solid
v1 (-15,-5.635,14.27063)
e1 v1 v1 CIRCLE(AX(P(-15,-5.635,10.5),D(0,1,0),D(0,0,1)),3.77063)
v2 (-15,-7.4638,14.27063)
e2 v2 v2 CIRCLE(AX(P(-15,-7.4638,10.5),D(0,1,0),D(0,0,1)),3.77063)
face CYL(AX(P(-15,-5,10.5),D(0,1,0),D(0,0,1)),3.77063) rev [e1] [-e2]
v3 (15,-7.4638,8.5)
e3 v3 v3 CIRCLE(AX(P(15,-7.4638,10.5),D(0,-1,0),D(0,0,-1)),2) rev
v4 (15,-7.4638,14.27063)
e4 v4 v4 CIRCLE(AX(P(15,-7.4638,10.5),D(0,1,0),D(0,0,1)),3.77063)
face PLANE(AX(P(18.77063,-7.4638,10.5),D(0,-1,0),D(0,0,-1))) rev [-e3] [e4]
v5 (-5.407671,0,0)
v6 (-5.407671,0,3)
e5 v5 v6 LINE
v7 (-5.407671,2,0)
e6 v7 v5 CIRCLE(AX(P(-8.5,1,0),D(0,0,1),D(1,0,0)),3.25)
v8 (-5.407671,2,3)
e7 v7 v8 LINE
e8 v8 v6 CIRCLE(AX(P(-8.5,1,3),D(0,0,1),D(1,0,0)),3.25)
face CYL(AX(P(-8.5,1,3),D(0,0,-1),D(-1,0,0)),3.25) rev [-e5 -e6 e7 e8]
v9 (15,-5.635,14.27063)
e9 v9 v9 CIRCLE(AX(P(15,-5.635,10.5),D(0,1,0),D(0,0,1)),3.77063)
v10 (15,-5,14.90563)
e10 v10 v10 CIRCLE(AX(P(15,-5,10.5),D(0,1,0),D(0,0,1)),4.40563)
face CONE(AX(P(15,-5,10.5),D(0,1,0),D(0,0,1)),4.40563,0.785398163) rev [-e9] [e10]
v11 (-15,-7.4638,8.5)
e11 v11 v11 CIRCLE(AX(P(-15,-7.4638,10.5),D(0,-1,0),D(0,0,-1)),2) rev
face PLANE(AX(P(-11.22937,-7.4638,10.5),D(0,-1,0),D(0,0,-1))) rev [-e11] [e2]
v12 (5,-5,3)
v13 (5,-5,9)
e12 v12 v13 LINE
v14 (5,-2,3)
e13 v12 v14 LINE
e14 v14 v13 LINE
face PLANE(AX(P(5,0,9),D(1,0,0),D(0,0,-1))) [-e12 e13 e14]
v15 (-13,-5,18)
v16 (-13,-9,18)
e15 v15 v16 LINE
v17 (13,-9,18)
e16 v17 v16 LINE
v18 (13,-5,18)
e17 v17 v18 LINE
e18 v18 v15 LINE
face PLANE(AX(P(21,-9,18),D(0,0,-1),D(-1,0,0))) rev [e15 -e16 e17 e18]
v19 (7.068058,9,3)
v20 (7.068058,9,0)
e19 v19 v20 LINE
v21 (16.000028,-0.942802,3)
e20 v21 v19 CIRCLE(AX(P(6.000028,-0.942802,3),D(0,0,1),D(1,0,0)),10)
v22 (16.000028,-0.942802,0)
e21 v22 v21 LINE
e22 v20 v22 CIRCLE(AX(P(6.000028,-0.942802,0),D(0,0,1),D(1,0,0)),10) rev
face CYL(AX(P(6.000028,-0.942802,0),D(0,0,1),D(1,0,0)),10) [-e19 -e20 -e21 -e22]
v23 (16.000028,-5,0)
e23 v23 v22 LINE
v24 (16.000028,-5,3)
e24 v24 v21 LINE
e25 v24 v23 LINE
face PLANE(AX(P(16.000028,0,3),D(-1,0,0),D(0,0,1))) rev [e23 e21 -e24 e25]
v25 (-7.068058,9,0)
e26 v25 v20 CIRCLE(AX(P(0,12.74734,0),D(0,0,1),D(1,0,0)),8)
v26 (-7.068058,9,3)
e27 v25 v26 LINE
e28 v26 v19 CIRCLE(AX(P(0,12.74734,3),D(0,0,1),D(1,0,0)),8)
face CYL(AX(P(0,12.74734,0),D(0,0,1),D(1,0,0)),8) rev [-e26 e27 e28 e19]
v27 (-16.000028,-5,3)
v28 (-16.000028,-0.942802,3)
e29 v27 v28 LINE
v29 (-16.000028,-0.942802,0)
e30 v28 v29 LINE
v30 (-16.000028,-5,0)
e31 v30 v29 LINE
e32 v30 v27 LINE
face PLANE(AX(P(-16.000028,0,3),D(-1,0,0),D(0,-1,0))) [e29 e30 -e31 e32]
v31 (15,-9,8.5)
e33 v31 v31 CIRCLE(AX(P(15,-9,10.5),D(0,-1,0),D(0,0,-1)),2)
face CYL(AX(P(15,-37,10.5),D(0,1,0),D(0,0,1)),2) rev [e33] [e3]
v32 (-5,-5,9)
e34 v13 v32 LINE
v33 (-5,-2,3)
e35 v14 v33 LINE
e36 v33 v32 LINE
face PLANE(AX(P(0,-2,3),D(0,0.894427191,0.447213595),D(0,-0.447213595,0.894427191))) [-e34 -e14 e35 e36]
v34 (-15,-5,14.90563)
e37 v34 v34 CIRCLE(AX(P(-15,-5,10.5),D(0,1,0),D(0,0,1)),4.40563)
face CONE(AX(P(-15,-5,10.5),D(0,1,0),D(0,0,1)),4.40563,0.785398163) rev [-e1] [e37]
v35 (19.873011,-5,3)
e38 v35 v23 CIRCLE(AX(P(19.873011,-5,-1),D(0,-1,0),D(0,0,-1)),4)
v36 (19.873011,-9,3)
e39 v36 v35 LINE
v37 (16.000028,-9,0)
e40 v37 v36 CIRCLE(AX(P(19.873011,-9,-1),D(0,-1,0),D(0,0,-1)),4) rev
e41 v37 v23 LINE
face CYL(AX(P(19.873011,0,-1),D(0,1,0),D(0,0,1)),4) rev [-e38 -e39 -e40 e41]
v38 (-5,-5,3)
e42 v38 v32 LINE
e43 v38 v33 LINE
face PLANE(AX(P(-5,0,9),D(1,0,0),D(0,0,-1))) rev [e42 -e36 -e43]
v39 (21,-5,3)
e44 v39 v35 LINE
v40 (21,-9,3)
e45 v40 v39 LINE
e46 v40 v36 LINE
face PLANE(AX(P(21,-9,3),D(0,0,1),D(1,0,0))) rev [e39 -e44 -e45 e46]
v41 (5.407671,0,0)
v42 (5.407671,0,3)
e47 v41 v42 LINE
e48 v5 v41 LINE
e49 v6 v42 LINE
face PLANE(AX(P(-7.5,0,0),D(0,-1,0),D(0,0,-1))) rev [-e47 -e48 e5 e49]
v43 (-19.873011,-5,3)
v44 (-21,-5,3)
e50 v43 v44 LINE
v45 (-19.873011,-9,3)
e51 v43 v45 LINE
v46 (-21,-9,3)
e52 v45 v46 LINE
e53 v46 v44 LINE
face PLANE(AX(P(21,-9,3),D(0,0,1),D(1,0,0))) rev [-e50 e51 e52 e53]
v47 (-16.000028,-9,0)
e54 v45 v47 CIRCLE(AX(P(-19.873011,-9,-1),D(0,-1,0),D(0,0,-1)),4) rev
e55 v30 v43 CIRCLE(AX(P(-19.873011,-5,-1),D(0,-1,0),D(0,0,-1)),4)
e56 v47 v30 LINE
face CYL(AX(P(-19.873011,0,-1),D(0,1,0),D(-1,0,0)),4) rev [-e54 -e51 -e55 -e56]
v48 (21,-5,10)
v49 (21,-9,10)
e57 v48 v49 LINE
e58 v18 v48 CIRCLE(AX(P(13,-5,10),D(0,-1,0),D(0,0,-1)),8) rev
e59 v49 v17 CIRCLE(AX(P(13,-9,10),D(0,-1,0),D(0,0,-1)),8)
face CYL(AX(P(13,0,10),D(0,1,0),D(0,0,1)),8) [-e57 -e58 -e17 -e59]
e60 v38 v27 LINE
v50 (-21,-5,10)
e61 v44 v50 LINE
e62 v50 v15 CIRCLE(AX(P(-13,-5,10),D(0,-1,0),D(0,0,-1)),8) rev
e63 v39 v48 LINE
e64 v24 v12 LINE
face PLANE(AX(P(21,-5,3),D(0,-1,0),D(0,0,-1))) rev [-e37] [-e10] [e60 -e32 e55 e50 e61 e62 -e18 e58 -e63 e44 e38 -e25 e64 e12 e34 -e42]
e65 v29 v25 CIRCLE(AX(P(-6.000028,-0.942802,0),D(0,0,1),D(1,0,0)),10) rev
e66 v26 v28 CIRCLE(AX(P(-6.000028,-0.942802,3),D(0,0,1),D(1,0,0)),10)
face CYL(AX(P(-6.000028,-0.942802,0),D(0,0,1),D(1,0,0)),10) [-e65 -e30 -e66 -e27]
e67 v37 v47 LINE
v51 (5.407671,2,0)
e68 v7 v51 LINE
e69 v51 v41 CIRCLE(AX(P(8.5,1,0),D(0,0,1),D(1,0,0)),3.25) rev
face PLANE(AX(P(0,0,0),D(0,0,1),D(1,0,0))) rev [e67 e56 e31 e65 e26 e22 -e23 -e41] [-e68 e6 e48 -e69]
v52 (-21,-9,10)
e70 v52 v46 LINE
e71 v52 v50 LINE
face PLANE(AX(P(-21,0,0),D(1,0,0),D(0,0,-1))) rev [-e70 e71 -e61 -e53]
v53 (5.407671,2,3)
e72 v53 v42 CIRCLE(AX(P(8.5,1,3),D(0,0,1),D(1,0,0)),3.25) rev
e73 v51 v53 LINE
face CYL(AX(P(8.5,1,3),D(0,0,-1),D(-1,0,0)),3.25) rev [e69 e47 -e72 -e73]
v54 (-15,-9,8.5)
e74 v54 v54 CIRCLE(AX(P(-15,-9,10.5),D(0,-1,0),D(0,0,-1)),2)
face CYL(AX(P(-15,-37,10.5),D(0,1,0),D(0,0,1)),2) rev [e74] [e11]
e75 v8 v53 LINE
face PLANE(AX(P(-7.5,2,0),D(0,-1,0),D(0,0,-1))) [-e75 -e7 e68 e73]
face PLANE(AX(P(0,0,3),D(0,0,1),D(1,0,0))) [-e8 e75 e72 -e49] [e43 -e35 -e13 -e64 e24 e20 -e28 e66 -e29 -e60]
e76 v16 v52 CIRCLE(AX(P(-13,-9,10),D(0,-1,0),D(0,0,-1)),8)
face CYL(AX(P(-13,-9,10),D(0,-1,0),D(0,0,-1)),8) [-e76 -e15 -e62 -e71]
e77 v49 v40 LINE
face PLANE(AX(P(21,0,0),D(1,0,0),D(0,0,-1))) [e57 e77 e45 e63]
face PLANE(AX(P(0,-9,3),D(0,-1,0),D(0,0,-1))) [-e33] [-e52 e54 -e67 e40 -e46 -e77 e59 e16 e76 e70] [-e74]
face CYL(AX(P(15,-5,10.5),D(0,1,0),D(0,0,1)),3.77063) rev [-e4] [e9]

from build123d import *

# Parameters (mm, degrees)
CROQUIS1_W                                  = 16.000027591
CROQUIS1_H                                  = 18
CROQUIS1_R                                  = 3.25
SALIENTE_EXTRUIR1_DEPTH                     = 3
CROQUIS2_W                                  = 15
CROQUIS2_H                                  = 2
CORTAR_EXTRUIR1_DEPTH                       = 3
REDONDEO1_R                                 = 10
CROQUIS3_W                                  = 15
CROQUIS3_H                                  = 4
SALIENTE_EXTRUIR2_DEPTH                     = 21
CROQUIS4_R                                  = 2
CORTAR_EXTRUIR2_DEPTH                       = 32
REDONDEO2_R                                 = 8
REFRENTADO_PARA_TORNILLO_CON_CABEZA_2_COUNT = 2
REFRENTADO_PARA_TORNILLO_CON_CABEZA_2_PITCH = 30
NERVIO1_REACH                               = 31.086
CROQUIS6_WALL_W                             = 66.880362222
CROQUIS6_WALL_H                             = 10
REDONDEO3_R                                 = 4


with BuildPart() as part:
    # Croquis1 → Saliente-Extruir1 (new body)
    # profile 1 of 2: a face of its own
    with BuildSketch(Plane.XY):
        with Locations((-8.000013796, 0)):
            Rectangle(CROQUIS1_W, CROQUIS1_H)
        with Locations((-8.5, 1)):
            Circle(CROQUIS1_R, mode=Mode.SUBTRACT)
    # profile 2 of 2: a face of its own
    with BuildSketch(Plane.XY):
        with Locations((8.000013796, 0)):
            Rectangle(CROQUIS1_W, CROQUIS1_H)
        with Locations((8.5, 1)):
            Circle(CROQUIS1_R, mode=Mode.SUBTRACT)
    extrude(amount=SALIENTE_EXTRUIR1_DEPTH)

    # Croquis2 → Cortar-Extruir1 (cut)
    with BuildSketch(Plane.XY.offset(3)):
        with BuildLine():
            ThreePointArc((7.068057866, 9), (7.76351927, 10.816597123), (8, 12.747340124))
            ThreePointArc((8, 12.747340124), (-1.930743001, 20.510859395), (-7.068057866, 9))
            Line((-7.068057866, 9), (7.068057866, 9))
        make_face()
        with BuildLine():
            Line((7.068057866, 9), (-7.068057866, 9))
            ThreePointArc((-7.068057866, 9), (0, 4.747340124), (7.068057866, 9))
        make_face()
        with Locations((0, 1)):
            Rectangle(CROQUIS2_W, CROQUIS2_H)
    extrude(amount=-CORTAR_EXTRUIR1_DEPTH, mode=Mode.SUBTRACT)

    # Redondeo1
    # the kernel refuses this fillet: 10 mm, written as the material it takes off along each edge
    with BuildSketch(Plane(origin=(16.000027591, 9, -24.857004965), x_dir=(-1, 0, 0), z_dir=(0, 0, 1))) as redondeo1_piece_1:
        with BuildLine():
            CenterArc((10, 9.942801986), REDONDEO1_R, 180, 83.86894335)
            Line((0, 9.942801986), (-0.2, 9.942801986))
            Line((-0.2, 9.942801986), (-0.2, 0))
            Line((-0.2, 0), (0, -0.2))
            ThreePointArc((0, -0.2), (4.465984863, -0.2), (8.91060912, -0.19885604))
            Line((8.91060912, -0.19885604), (8.931969726, 0))
        make_face()
    extrude(amount=52.71400993, mode=Mode.SUBTRACT)
    with BuildSketch(Plane(origin=(-16.000027591, 9, -24.857004965), x_dir=(1, 0, 0), z_dir=(0, 0, 1))) as redondeo1_piece_2:
        with BuildLine():
            CenterArc((10, -9.942801986), REDONDEO1_R, 96.13105665, 83.86894335)
            Line((0, -9.942801986), (-0.2, -9.942801986))
            Line((-0.2, -9.942801986), (-0.2, 0))
            Line((-0.2, 0), (0, 0.2))
            ThreePointArc((0, 0.2), (4.465984863, 0.2), (8.91060912, 0.19885604))
            Line((8.91060912, 0.19885604), (8.931969726, 0))
        make_face()
    extrude(amount=52.71400993, mode=Mode.SUBTRACT)

    # Croquis3 → Saliente-Extruir2 (add, symmetric)
    with BuildSketch(Plane(origin=(0, 0, 0), x_dir=(0, 0, -1), z_dir=(1, 0, 0))):
        with Locations((-10.5, -7)):
            Rectangle(CROQUIS3_W, CROQUIS3_H)
    extrude(amount=SALIENTE_EXTRUIR2_DEPTH, both=True)

    # Croquis4 → Cortar-Extruir2 (cut)
    with BuildSketch(Plane(origin=(0, -5, 0), x_dir=(1, 0, 0), z_dir=(0, 1, 0))):
        with Locations(Location((-15, -10.5, 0), (0, 0, 270))):
            Circle(CROQUIS4_R)
        with Locations(Location((15, -10.5, 0), (0, 0, 90))):
            Circle(CROQUIS4_R)
    extrude(amount=-CORTAR_EXTRUIR2_DEPTH, mode=Mode.SUBTRACT)

    # Redondeo2
    redondeo2_edges = [part.edges().sort_by_distance(p)[0] for p in [
        (-21, -7, 18),
        (21, -7, 18),
    ]]
    fillet(redondeo2_edges, radius=REDONDEO2_R)

    # Croquis5 → Refrentado para tornillo con cabeza troncocónica de #61 (revolve, cut)
    with BuildSketch(Plane(origin=(-15, -5, 10.5), x_dir=(0, 0, 1), z_dir=(1, 0, 0))):
        Polygon((0, 0), (0, 4), (1.89865, 4), (1.89865, 2.4638), (3.77063, 2.4638), (3.77063, 0.635), (4.40563, 0), align=None)
    refrentado_para_tornillo_con_cabeza_tron = revolve(axis=Axis((-15, 1.35, 10.5), (0, -1, 0)), mode=Mode.SUBTRACT)

    # Refrentado para tornillo con cabeza  2: Refrentado para tornillo con cabeza troncocónica de #61 ×2
    with Locations(*[(i * REFRENTADO_PARA_TORNILLO_CON_CABEZA_2_PITCH, 0, 0) for i in range(1, REFRENTADO_PARA_TORNILLO_CON_CABEZA_2_COUNT)]):
        add(refrentado_para_tornillo_con_cabeza_tron, mode=Mode.SUBTRACT)

    # Croquis6 wall → Nervio1 (add, up to next)
    with BuildSketch(Plane(origin=(0, -3.5, 6), x_dir=(0, -0.4472135955, 0.894427191), z_dir=(0, -0.894427191, -0.4472135955)), mode=Mode.PRIVATE) as nervio1_sk1:
        Rectangle(CROQUIS6_WALL_W, CROQUIS6_WALL_H)
    nervio1_tool1 = extrude(nervio1_sk1.sketch, amount=NERVIO1_REACH, mode=Mode.PRIVATE) - part.part
    add(nervio1_tool1.solids().sort_by_distance((0, -3.5, 6))[0])

    # Redondeo3
    # the kernel refuses this fillet: 4 mm, written as the material it adds along each edge
    with BuildSketch(Plane(origin=(16.000027591, -9, 3), x_dir=(0, 0, -1), z_dir=(0, 1, 0))) as redondeo3_piece_1:
        with BuildLine():
            CenterArc((4, -3.872983346), REDONDEO3_R, 104.477512186, 75.522487814)
            Line((0, -3.872983346), (0, 0))
            Line((0, 0), (3, 0))
        make_face()
    extrude(amount=4)
    with BuildSketch(Plane(origin=(-16.000027591, -9, 3), x_dir=(-1, 0, 0), z_dir=(0, 1, 0))) as redondeo3_piece_2:
        with BuildLine():
            CenterArc((3.872983346, -4), REDONDEO3_R, 90, 75.522487814)
            Line((0, -3), (0, 0))
            Line((0, 0), (3.872983346, 0))
        make_face()
    extrude(amount=4)


solid = part.part
